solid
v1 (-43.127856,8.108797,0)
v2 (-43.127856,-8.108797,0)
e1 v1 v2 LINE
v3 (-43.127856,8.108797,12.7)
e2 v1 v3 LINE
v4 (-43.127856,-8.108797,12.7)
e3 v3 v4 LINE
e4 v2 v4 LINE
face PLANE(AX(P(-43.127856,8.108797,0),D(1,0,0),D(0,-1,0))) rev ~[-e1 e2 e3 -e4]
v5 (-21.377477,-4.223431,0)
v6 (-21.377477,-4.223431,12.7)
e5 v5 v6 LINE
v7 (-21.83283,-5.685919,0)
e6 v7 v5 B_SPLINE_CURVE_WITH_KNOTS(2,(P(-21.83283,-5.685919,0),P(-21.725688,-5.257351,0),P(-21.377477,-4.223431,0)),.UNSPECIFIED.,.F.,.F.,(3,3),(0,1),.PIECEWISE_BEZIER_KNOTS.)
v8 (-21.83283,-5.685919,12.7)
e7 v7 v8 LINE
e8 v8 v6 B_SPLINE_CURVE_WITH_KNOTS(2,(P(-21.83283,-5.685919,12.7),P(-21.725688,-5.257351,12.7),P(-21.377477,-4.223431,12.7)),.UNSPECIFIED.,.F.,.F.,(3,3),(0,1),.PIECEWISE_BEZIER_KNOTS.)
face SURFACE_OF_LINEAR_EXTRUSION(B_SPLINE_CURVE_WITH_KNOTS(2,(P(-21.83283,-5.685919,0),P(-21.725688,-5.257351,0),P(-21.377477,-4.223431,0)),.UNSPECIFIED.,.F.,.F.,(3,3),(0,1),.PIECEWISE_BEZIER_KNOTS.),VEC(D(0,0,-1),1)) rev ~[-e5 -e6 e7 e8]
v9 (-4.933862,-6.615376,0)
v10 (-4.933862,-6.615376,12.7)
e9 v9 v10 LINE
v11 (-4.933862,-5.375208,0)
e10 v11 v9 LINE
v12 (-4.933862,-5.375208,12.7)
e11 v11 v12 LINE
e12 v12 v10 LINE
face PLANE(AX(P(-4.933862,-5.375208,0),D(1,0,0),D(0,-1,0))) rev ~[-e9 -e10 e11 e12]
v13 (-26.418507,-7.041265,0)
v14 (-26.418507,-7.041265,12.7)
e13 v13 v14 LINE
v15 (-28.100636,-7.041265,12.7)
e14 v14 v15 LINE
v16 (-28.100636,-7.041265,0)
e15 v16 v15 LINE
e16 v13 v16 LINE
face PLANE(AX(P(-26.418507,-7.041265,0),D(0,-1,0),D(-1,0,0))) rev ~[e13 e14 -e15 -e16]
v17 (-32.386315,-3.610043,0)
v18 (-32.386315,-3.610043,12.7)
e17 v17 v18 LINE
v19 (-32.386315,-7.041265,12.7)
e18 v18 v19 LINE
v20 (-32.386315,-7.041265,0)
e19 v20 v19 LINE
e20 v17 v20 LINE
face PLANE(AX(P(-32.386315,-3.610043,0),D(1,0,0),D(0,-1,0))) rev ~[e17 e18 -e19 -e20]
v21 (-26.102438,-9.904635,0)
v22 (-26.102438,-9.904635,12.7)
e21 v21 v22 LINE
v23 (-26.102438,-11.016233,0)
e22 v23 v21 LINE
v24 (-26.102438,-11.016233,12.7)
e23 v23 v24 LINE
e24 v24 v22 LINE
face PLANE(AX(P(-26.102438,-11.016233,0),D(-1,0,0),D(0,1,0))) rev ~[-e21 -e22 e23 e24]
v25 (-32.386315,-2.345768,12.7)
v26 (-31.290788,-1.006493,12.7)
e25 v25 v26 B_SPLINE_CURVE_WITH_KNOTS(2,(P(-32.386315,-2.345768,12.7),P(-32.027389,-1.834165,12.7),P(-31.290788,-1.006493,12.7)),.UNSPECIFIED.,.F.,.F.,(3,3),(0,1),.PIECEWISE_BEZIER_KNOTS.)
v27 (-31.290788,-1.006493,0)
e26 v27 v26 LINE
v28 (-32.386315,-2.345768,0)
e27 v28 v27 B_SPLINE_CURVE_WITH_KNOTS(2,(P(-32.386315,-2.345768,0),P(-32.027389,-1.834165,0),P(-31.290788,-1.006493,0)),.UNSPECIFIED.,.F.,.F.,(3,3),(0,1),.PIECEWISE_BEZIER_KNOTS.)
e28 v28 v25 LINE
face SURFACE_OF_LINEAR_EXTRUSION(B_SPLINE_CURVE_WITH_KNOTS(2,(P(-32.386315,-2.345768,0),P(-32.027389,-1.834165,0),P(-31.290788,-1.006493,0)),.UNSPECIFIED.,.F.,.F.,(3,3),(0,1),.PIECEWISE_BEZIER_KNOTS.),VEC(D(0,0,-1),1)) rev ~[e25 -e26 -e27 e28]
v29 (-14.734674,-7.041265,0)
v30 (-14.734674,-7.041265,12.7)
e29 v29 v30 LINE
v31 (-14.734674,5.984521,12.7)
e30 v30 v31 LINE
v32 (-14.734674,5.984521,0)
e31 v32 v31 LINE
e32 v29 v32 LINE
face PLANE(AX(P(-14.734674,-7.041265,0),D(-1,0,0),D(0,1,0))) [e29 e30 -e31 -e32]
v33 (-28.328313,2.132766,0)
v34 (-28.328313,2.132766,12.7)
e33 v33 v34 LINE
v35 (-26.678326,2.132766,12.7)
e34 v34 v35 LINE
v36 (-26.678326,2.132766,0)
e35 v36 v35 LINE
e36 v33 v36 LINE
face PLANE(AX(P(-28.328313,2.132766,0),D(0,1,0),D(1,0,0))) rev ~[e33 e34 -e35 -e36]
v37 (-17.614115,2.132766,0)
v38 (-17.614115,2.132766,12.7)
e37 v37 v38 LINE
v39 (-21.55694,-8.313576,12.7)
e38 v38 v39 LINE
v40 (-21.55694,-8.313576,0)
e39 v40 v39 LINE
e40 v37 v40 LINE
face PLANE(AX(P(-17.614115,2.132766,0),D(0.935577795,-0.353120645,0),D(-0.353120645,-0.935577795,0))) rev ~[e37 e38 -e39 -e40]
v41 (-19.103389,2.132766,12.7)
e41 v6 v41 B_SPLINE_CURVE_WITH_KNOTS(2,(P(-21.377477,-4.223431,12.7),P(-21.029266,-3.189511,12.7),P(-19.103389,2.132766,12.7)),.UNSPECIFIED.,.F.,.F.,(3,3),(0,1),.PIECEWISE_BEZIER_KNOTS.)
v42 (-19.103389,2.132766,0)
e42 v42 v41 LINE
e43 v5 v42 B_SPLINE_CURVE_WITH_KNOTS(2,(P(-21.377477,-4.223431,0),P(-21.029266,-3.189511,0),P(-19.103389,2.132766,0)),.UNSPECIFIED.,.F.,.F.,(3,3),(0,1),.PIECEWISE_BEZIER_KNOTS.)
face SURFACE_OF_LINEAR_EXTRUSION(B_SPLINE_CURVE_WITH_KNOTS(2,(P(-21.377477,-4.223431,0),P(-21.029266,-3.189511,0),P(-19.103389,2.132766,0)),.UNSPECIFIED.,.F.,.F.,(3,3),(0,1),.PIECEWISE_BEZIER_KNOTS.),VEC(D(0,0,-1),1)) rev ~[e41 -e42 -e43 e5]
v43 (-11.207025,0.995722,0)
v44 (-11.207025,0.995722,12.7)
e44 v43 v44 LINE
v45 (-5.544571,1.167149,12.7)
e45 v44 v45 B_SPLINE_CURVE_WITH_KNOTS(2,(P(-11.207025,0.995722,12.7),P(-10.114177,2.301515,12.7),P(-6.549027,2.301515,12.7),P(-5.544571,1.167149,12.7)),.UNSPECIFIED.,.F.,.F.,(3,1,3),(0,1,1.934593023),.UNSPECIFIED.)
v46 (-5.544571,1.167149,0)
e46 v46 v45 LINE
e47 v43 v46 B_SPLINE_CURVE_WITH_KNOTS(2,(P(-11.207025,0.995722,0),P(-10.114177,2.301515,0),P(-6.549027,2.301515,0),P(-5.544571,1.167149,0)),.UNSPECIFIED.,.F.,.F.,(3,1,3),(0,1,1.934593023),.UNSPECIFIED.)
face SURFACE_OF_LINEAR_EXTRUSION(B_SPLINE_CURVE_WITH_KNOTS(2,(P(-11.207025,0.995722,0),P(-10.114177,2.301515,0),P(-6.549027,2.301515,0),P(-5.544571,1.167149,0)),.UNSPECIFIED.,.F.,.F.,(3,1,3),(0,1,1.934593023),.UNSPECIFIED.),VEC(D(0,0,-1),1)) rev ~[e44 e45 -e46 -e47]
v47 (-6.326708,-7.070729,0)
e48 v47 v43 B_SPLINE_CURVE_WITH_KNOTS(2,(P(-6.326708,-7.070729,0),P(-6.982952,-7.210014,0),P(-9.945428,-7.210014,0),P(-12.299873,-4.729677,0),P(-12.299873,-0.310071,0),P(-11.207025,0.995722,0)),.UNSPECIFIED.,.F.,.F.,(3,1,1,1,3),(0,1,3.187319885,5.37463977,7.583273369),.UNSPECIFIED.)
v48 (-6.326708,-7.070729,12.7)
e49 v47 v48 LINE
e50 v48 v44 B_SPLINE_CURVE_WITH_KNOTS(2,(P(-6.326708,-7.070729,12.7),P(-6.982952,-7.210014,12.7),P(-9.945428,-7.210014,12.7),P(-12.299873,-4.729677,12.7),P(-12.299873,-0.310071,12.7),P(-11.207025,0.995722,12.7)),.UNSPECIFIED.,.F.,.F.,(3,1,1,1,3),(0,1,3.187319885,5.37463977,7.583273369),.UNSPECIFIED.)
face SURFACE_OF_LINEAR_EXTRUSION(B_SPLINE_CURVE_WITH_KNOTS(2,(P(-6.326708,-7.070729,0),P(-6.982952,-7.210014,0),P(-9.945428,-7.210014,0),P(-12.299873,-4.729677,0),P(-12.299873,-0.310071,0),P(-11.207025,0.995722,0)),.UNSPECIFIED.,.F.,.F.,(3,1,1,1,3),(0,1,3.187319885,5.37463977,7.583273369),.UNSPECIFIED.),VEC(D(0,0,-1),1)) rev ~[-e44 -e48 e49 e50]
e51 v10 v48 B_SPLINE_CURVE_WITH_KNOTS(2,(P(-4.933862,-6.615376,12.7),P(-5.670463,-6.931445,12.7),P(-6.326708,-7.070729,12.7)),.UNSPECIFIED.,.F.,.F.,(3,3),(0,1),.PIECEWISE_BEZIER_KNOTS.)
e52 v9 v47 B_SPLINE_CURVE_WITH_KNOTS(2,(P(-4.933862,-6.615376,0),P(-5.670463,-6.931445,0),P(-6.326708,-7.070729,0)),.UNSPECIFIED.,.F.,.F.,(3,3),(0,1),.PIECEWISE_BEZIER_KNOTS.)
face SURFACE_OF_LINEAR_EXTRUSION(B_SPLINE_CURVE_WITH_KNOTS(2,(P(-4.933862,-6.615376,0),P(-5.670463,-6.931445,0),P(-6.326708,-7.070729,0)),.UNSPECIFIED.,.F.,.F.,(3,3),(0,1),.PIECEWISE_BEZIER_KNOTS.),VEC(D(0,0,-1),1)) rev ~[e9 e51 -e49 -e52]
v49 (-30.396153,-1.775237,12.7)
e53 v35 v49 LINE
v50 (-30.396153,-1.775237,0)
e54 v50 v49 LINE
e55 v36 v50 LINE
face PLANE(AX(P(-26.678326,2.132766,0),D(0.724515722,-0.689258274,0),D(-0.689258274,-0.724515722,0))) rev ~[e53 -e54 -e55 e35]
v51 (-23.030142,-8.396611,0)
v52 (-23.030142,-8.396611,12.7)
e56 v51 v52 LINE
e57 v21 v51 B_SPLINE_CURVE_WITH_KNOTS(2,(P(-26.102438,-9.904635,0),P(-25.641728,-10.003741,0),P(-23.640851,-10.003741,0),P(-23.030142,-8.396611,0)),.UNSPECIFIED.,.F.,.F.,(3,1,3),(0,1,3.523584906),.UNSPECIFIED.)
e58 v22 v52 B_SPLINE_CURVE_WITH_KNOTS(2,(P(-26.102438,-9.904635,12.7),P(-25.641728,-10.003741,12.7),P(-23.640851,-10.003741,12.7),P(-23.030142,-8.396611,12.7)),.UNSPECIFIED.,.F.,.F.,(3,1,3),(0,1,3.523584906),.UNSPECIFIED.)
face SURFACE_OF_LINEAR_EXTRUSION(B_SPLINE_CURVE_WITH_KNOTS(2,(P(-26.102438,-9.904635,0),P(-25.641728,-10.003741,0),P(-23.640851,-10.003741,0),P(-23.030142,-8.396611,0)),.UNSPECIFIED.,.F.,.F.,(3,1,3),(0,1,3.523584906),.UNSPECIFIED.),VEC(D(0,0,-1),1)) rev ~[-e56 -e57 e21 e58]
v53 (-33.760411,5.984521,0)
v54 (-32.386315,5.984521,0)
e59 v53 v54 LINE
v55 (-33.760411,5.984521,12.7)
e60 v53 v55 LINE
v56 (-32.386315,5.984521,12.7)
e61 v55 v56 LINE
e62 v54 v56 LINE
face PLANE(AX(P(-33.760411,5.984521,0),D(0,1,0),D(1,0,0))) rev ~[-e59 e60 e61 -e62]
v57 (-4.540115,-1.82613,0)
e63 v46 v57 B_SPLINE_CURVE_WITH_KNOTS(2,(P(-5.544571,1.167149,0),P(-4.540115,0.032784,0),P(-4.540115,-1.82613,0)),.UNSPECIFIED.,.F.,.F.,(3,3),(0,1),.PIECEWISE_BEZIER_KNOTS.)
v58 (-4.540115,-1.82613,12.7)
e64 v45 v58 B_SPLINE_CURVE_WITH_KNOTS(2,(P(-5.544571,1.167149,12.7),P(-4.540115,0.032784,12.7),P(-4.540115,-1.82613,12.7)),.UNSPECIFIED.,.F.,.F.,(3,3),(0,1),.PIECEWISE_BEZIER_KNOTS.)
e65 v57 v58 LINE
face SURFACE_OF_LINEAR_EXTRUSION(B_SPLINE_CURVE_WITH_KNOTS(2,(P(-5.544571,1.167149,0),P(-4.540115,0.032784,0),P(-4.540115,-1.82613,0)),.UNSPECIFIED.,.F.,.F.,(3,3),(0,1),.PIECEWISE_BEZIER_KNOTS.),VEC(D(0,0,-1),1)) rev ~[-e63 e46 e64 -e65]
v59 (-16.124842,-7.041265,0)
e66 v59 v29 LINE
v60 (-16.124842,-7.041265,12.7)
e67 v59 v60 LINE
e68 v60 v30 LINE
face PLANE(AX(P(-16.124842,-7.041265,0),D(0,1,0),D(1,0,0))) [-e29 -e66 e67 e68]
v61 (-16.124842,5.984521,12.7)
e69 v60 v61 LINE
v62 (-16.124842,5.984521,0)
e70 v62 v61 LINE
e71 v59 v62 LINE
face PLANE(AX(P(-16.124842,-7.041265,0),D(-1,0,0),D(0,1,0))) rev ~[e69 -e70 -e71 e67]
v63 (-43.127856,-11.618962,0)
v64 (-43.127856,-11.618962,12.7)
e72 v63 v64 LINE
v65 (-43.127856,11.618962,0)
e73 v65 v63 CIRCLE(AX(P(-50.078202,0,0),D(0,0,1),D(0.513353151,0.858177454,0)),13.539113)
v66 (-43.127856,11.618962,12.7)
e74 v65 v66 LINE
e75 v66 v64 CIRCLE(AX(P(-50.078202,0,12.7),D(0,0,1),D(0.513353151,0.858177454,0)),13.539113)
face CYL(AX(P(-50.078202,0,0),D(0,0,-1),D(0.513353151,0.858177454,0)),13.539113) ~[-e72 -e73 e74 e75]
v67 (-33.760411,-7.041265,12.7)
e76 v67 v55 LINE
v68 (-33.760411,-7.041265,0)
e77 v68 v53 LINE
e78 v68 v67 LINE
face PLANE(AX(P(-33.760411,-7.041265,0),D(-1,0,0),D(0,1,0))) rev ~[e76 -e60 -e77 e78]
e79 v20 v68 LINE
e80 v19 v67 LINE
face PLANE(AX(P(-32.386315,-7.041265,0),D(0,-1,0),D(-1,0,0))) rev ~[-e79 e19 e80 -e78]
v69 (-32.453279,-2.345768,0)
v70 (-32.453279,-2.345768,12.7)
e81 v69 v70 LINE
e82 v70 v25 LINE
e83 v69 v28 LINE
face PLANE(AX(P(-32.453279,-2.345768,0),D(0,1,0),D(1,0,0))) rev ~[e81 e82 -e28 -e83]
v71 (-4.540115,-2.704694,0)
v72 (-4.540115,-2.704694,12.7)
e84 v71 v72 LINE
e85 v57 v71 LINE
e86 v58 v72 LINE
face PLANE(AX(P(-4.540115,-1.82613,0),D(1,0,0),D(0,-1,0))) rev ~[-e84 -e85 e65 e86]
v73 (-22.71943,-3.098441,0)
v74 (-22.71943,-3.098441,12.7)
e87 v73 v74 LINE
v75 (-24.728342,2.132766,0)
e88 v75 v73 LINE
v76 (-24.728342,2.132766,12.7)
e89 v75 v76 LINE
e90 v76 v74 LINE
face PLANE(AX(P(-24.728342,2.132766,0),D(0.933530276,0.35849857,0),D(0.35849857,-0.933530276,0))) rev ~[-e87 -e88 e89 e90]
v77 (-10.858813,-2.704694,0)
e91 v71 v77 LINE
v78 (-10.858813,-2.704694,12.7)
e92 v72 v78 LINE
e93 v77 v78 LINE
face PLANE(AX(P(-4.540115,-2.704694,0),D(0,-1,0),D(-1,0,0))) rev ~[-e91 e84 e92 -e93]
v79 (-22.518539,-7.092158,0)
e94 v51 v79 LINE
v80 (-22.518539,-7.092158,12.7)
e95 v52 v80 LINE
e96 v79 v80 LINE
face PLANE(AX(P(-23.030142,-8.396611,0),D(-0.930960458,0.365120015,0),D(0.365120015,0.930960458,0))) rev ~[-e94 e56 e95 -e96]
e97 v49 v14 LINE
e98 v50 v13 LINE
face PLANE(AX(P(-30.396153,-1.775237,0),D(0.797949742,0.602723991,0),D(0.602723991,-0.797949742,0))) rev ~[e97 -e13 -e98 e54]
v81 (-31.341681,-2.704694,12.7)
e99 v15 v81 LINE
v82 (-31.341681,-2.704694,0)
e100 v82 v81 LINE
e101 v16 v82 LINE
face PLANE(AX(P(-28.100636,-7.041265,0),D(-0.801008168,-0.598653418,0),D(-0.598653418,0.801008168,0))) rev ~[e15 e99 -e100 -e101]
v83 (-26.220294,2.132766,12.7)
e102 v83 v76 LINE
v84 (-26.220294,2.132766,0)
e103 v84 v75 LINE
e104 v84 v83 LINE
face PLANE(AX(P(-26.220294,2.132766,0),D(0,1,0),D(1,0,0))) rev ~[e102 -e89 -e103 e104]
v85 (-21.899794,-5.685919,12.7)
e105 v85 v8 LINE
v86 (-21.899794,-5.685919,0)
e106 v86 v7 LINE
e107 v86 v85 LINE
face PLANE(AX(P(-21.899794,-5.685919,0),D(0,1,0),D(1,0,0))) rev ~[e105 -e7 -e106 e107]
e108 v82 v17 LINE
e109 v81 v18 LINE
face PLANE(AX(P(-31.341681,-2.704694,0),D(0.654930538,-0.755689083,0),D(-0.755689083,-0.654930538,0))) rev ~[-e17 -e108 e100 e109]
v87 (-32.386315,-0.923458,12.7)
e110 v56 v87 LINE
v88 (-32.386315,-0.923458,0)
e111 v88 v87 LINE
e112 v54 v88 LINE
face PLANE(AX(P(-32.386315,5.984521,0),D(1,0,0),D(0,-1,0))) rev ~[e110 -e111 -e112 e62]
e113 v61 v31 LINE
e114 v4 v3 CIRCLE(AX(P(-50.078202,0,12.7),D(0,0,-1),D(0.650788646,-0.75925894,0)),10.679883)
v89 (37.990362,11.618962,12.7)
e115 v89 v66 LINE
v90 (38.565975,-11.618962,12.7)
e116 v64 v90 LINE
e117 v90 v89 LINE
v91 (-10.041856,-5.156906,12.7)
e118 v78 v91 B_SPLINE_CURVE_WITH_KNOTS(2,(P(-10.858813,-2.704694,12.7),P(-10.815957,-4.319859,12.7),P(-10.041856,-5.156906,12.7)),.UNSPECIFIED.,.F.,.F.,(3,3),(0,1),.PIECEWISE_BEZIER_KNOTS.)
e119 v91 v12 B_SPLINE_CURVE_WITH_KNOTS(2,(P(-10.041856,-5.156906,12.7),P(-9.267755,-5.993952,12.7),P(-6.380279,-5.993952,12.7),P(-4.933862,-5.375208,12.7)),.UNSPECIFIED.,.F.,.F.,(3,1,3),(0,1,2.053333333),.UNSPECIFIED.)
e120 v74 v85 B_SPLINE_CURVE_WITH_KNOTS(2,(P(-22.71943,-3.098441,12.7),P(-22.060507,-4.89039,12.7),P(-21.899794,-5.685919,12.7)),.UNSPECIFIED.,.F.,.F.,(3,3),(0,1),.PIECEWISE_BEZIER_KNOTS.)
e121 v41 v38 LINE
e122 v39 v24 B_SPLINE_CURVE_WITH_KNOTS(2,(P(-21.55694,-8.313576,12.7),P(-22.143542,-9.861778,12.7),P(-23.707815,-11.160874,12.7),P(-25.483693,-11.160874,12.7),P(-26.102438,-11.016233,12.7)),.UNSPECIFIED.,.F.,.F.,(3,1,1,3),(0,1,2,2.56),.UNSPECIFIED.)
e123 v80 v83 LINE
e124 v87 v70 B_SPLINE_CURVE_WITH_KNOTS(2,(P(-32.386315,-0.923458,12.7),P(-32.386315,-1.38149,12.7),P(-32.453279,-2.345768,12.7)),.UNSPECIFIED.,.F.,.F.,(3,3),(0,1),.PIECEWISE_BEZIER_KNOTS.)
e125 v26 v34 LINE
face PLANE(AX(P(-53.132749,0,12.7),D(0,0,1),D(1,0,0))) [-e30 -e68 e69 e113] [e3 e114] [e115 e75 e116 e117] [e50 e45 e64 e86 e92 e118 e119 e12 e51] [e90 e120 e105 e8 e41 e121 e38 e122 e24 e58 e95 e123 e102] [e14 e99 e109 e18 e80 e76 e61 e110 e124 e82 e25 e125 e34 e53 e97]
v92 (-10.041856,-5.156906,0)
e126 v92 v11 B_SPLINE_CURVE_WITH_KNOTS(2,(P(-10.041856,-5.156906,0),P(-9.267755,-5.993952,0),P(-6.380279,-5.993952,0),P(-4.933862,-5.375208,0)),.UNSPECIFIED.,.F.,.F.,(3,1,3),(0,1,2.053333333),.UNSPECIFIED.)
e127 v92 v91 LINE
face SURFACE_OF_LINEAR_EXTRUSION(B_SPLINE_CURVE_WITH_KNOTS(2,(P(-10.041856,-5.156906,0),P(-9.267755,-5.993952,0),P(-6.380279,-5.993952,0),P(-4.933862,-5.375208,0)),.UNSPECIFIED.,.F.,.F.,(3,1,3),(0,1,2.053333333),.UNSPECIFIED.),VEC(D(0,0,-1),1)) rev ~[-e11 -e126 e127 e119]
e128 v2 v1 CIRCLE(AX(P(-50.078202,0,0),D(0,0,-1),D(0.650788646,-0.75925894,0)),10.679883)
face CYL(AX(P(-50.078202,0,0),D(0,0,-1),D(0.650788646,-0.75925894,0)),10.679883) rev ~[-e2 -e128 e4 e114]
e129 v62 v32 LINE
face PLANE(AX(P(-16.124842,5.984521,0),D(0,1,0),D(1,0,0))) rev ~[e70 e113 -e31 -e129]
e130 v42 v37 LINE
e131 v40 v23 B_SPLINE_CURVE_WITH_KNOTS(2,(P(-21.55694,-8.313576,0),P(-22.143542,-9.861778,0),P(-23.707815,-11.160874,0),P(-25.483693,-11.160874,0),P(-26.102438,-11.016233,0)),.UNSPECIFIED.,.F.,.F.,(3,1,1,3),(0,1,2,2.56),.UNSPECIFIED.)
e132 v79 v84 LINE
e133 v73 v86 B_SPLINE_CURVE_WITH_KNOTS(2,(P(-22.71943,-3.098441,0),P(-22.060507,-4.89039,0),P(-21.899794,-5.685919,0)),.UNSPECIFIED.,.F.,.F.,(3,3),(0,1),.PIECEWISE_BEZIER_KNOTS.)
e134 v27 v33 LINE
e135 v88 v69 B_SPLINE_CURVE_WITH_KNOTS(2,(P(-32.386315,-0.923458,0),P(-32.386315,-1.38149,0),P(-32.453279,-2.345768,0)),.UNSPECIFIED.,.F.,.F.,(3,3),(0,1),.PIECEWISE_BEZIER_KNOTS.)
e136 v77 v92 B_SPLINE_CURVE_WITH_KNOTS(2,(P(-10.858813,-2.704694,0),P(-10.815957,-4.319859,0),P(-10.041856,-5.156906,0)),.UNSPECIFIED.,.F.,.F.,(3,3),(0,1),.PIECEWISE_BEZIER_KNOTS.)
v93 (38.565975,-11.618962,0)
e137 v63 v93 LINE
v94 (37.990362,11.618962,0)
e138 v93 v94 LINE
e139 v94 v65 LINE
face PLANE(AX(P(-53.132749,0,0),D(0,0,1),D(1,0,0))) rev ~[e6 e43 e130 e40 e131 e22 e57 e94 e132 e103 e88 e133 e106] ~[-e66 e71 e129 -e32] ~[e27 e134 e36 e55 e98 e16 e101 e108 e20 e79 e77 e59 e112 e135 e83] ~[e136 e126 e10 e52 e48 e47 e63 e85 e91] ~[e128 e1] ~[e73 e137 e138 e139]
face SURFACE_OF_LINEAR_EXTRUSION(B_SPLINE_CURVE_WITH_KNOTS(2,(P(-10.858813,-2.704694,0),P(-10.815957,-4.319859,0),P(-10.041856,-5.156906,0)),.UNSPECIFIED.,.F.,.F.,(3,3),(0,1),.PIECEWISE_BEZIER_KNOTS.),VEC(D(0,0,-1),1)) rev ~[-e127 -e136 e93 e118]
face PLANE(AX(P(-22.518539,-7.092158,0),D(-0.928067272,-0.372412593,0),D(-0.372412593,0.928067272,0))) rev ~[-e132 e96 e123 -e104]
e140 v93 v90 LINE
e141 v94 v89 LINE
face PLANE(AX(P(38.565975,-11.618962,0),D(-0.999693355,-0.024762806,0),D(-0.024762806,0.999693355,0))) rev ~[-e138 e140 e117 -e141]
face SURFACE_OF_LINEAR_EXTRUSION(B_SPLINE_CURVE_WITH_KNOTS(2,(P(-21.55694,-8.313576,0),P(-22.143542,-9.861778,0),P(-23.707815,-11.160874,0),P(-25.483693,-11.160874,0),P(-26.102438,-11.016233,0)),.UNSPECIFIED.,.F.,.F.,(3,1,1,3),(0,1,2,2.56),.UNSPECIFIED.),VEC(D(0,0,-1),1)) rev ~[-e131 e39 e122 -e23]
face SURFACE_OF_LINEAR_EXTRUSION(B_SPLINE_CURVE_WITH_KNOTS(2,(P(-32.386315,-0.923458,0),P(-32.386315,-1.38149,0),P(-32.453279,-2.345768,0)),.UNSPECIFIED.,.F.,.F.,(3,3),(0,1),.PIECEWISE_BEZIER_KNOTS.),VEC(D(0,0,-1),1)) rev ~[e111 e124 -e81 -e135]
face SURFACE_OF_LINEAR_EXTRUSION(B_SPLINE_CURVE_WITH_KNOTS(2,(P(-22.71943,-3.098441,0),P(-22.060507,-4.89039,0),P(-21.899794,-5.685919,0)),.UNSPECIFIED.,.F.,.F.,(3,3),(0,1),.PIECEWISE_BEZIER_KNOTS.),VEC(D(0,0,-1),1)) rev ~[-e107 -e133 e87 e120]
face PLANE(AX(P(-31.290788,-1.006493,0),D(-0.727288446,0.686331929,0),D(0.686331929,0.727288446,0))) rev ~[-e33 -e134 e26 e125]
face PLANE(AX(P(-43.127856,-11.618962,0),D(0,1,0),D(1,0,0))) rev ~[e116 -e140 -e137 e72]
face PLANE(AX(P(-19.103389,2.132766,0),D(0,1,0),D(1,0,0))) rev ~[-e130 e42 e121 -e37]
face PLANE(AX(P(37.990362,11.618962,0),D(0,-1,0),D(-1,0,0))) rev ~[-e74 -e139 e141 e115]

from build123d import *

# Parameters (mm, degrees)
F0_W     = 1.390167144
F0_H     = 13.0257857824
F1_DEPTH = 12.7


with BuildPart() as f1:
    # F0 (on Top) → F1 (new body)
    with BuildSketch(Plane.XY):
        with BuildLine():
            Line((-43.1278555505, 8.1087965258), (-43.1278555505, 11.6189617885))
            ThreePointArc((-43.1278555505, 11.6189617885), (-63.6173153539, 0), (-43.1278555505, -11.6189617885))
            Line((-43.1278555505, -11.6189617885), (-43.1278555505, -8.1087965258))
            ThreePointArc((-43.1278555505, -8.1087965258), (-60.7580848758, 0), (-43.1278555505, 8.1087965258))
        make_face()
        Polygon((37.9903619809, 11.6189617885), (-43.1278555505, 11.6189617885), (-43.1278555505, 8.1087965258), (-43.1278555505, -8.1087965258), (-43.1278555505, -11.6189617885), (38.5659746826, -11.6189617885), align=None)
        with BuildLine():
            Line((-22.5185390528, -7.0921576955), (-26.2202943379, 2.1327664737))
            Line((-26.2202943379, 2.1327664737), (-24.7283423163, 2.1327664737))
            Line((-24.7283423163, 2.1327664737), (-22.7194302586, -3.0984405247))
            add(Edge.make_bspline(
                [(-22.7194302586, -3.0984405247), (-22.0605071037, -4.8903900802), (-21.899794139, -5.6859192551)],
                knots=[0, 0, 0, 1, 1, 1], degree=2))
            Line((-21.899794139, -5.6859192551), (-21.8328304038, -5.6859192551))
            add(Edge.make_bspline(
                [(-21.8328304038, -5.6859192551), (-21.7256884274, -5.2573513494), (-21.377477004, -4.223431277)],
                knots=[0, 0, 0, 1, 1, 1], degree=2))
            add(Edge.make_bspline(
                [(-21.377477004, -4.223431277), (-21.0292655807, -3.1895112047), (-19.1033885547, 2.1327664737)],
                knots=[0, 0, 0, 1, 1, 1], degree=2))
            Line((-19.1033885547, 2.1327664737), (-17.6141150825, 2.1327664737))
            Line((-17.6141150825, 2.1327664737), (-21.5569398145, -8.3135762266))
            add(Edge.make_bspline(
                [(-21.5569398145, -8.3135762266), (-22.1435421354, -9.8617777858), (-22.9256785632, -10.5113260178)],
                knots=[0, 0, 0, 1, 1, 1], degree=2))
            add(Edge.make_bspline(
                [(-22.9256785632, -10.5113260178), (-23.707814991, -11.1608742498), (-24.8461984904, -11.1608742498)],
                knots=[0, 0, 0, 1, 1, 1], degree=2))
            add(Edge.make_bspline(
                [(-24.8461984904, -11.1608742498), (-25.4836932501, -11.1608742498), (-26.1024381638, -11.0162325816)],
                knots=[0, 0, 0, 1, 1, 1], degree=2))
            Line((-26.1024381638, -11.0162325816), (-26.1024381638, -9.9046345763))
            add(Edge.make_bspline(
                [(-26.1024381638, -9.9046345763), (-25.6417276653, -10.0037409045), (-25.0738751903, -10.0037409045)],
                knots=[0, 0, 0, 1, 1, 1], degree=2))
            add(Edge.make_bspline(
                [(-25.0738751903, -10.0037409045), (-23.6408512558, -10.0037409045), (-23.0301419902, -8.3966112583)],
                knots=[0, 0, 0, 1, 1, 1], degree=2))
            Line((-23.0301419902, -8.3966112583), (-22.5185390528, -7.0921576955))
        make_face(mode=Mode.SUBTRACT)
        with BuildLine():
            Line((-32.4532788157, -2.3457681404), (-32.3863150805, -2.3457681404))
            add(Edge.make_bspline(
                [(-32.3863150805, -2.3457681404), (-32.0273894595, -1.834165203), (-31.2907883716, -1.0064934352)],
                knots=[0, 0, 0, 1, 1, 1], degree=2))
            Line((-31.2907883716, -1.0064934352), (-28.3283127238, 2.1327664737))
            Line((-28.3283127238, 2.1327664737), (-26.6783262871, 2.1327664737))
            Line((-26.6783262871, 2.1327664737), (-30.3961528686, -1.775237116))
            Line((-30.3961528686, -1.775237116), (-26.4185069943, -7.0412652567))
            Line((-26.4185069943, -7.0412652567), (-28.1006360239, -7.0412652567))
            Line((-28.1006360239, -7.0412652567), (-31.3416808104, -2.7046937614))
            Line((-31.3416808104, -2.7046937614), (-32.3863150805, -3.6100434621))
            Line((-32.3863150805, -3.6100434621), (-32.3863150805, -7.0412652567))
            Line((-32.3863150805, -7.0412652567), (-33.760410928, -7.0412652567))
            Line((-33.760410928, -7.0412652567), (-33.760410928, 5.9845205257))
            Line((-33.760410928, 5.9845205257), (-32.3863150805, 5.9845205257))
            Line((-32.3863150805, 5.9845205257), (-32.3863150805, -0.9234584035))
            add(Edge.make_bspline(
                [(-32.3863150805, -0.9234584035), (-32.3863150805, -1.3814903527), (-32.4532788157, -2.3457681404)],
                knots=[0, 0, 0, 1, 1, 1], degree=2))
        make_face(mode=Mode.SUBTRACT)
        with Locations((-15.4297580384, -0.5283723655)):
            Rectangle(F0_W, F0_H, mode=Mode.SUBTRACT)
        with BuildLine():
            add(Edge.make_bspline(
                [(-6.3267078674, -7.0707293002), (-6.982952473, -7.2100138696), (-7.9124091183, -7.2100138696)],
                knots=[0, 0, 0, 1, 1, 1], degree=2))
            add(Edge.make_bspline(
                [(-7.9124091183, -7.2100138696), (-9.9454281208, -7.2100138696), (-11.1226505866, -5.9698454926)],
                knots=[0, 0, 0, 1, 1, 1], degree=2))
            add(Edge.make_bspline(
                [(-11.1226505866, -5.9698454926), (-12.2998730524, -4.7296771156), (-12.2998730524, -2.5305880497)],
                knots=[0, 0, 0, 1, 1, 1], degree=2))
            add(Edge.make_bspline(
                [(-12.2998730524, -2.5305880497), (-12.2998730524, -0.3100705886), (-11.207024893, 0.995722249)],
                knots=[0, 0, 0, 1, 1, 1], degree=2))
            add(Edge.make_bspline(
                [(-11.207024893, 0.995722249), (-10.1141767336, 2.3015150865), (-8.2713347393, 2.3015150865)],
                knots=[0, 0, 0, 1, 1, 1], degree=2))
            add(Edge.make_bspline(
                [(-8.2713347393, 2.3015150865), (-6.5490274685, 2.3015150865), (-5.5445714396, 1.1671494112)],
                knots=[0, 0, 0, 1, 1, 1], degree=2))
            add(Edge.make_bspline(
                [(-5.5445714396, 1.1671494112), (-4.5401154107, 0.032783736), (-4.5401154107, -1.8261295548)],
                knots=[0, 0, 0, 1, 1, 1], degree=2))
            Line((-4.5401154107, -1.8261295548), (-4.5401154107, -2.7046937614))
            Line((-4.5401154107, -2.7046937614), (-10.8588134697, -2.7046937614))
            add(Edge.make_bspline(
                [(-10.8588134697, -2.7046937614), (-10.8159566791, -4.3198590558), (-10.0418558995, -5.1569057465)],
                knots=[0, 0, 0, 1, 1, 1], degree=2))
            add(Edge.make_bspline(
                [(-10.0418558995, -5.1569057465), (-9.26775512, -5.9939524373), (-7.8615166795, -5.9939524373)],
                knots=[0, 0, 0, 1, 1, 1], degree=2))
            add(Edge.make_bspline(
                [(-7.8615166795, -5.9939524373), (-6.3802788556, -5.9939524373), (-4.9338621741, -5.3752075235)],
                knots=[0, 0, 0, 1, 1, 1], degree=2))
            Line((-4.9338621741, -5.3752075235), (-4.9338621741, -6.6153759005))
            add(Edge.make_bspline(
                [(-4.9338621741, -6.6153759005), (-5.6704632619, -6.9314447309), (-6.3267078674, -7.0707293002)],
                knots=[0, 0, 0, 1, 1, 1], degree=2))
        make_face(mode=Mode.SUBTRACT)
    extrude(amount=F1_DEPTH)


solid = f1.part
